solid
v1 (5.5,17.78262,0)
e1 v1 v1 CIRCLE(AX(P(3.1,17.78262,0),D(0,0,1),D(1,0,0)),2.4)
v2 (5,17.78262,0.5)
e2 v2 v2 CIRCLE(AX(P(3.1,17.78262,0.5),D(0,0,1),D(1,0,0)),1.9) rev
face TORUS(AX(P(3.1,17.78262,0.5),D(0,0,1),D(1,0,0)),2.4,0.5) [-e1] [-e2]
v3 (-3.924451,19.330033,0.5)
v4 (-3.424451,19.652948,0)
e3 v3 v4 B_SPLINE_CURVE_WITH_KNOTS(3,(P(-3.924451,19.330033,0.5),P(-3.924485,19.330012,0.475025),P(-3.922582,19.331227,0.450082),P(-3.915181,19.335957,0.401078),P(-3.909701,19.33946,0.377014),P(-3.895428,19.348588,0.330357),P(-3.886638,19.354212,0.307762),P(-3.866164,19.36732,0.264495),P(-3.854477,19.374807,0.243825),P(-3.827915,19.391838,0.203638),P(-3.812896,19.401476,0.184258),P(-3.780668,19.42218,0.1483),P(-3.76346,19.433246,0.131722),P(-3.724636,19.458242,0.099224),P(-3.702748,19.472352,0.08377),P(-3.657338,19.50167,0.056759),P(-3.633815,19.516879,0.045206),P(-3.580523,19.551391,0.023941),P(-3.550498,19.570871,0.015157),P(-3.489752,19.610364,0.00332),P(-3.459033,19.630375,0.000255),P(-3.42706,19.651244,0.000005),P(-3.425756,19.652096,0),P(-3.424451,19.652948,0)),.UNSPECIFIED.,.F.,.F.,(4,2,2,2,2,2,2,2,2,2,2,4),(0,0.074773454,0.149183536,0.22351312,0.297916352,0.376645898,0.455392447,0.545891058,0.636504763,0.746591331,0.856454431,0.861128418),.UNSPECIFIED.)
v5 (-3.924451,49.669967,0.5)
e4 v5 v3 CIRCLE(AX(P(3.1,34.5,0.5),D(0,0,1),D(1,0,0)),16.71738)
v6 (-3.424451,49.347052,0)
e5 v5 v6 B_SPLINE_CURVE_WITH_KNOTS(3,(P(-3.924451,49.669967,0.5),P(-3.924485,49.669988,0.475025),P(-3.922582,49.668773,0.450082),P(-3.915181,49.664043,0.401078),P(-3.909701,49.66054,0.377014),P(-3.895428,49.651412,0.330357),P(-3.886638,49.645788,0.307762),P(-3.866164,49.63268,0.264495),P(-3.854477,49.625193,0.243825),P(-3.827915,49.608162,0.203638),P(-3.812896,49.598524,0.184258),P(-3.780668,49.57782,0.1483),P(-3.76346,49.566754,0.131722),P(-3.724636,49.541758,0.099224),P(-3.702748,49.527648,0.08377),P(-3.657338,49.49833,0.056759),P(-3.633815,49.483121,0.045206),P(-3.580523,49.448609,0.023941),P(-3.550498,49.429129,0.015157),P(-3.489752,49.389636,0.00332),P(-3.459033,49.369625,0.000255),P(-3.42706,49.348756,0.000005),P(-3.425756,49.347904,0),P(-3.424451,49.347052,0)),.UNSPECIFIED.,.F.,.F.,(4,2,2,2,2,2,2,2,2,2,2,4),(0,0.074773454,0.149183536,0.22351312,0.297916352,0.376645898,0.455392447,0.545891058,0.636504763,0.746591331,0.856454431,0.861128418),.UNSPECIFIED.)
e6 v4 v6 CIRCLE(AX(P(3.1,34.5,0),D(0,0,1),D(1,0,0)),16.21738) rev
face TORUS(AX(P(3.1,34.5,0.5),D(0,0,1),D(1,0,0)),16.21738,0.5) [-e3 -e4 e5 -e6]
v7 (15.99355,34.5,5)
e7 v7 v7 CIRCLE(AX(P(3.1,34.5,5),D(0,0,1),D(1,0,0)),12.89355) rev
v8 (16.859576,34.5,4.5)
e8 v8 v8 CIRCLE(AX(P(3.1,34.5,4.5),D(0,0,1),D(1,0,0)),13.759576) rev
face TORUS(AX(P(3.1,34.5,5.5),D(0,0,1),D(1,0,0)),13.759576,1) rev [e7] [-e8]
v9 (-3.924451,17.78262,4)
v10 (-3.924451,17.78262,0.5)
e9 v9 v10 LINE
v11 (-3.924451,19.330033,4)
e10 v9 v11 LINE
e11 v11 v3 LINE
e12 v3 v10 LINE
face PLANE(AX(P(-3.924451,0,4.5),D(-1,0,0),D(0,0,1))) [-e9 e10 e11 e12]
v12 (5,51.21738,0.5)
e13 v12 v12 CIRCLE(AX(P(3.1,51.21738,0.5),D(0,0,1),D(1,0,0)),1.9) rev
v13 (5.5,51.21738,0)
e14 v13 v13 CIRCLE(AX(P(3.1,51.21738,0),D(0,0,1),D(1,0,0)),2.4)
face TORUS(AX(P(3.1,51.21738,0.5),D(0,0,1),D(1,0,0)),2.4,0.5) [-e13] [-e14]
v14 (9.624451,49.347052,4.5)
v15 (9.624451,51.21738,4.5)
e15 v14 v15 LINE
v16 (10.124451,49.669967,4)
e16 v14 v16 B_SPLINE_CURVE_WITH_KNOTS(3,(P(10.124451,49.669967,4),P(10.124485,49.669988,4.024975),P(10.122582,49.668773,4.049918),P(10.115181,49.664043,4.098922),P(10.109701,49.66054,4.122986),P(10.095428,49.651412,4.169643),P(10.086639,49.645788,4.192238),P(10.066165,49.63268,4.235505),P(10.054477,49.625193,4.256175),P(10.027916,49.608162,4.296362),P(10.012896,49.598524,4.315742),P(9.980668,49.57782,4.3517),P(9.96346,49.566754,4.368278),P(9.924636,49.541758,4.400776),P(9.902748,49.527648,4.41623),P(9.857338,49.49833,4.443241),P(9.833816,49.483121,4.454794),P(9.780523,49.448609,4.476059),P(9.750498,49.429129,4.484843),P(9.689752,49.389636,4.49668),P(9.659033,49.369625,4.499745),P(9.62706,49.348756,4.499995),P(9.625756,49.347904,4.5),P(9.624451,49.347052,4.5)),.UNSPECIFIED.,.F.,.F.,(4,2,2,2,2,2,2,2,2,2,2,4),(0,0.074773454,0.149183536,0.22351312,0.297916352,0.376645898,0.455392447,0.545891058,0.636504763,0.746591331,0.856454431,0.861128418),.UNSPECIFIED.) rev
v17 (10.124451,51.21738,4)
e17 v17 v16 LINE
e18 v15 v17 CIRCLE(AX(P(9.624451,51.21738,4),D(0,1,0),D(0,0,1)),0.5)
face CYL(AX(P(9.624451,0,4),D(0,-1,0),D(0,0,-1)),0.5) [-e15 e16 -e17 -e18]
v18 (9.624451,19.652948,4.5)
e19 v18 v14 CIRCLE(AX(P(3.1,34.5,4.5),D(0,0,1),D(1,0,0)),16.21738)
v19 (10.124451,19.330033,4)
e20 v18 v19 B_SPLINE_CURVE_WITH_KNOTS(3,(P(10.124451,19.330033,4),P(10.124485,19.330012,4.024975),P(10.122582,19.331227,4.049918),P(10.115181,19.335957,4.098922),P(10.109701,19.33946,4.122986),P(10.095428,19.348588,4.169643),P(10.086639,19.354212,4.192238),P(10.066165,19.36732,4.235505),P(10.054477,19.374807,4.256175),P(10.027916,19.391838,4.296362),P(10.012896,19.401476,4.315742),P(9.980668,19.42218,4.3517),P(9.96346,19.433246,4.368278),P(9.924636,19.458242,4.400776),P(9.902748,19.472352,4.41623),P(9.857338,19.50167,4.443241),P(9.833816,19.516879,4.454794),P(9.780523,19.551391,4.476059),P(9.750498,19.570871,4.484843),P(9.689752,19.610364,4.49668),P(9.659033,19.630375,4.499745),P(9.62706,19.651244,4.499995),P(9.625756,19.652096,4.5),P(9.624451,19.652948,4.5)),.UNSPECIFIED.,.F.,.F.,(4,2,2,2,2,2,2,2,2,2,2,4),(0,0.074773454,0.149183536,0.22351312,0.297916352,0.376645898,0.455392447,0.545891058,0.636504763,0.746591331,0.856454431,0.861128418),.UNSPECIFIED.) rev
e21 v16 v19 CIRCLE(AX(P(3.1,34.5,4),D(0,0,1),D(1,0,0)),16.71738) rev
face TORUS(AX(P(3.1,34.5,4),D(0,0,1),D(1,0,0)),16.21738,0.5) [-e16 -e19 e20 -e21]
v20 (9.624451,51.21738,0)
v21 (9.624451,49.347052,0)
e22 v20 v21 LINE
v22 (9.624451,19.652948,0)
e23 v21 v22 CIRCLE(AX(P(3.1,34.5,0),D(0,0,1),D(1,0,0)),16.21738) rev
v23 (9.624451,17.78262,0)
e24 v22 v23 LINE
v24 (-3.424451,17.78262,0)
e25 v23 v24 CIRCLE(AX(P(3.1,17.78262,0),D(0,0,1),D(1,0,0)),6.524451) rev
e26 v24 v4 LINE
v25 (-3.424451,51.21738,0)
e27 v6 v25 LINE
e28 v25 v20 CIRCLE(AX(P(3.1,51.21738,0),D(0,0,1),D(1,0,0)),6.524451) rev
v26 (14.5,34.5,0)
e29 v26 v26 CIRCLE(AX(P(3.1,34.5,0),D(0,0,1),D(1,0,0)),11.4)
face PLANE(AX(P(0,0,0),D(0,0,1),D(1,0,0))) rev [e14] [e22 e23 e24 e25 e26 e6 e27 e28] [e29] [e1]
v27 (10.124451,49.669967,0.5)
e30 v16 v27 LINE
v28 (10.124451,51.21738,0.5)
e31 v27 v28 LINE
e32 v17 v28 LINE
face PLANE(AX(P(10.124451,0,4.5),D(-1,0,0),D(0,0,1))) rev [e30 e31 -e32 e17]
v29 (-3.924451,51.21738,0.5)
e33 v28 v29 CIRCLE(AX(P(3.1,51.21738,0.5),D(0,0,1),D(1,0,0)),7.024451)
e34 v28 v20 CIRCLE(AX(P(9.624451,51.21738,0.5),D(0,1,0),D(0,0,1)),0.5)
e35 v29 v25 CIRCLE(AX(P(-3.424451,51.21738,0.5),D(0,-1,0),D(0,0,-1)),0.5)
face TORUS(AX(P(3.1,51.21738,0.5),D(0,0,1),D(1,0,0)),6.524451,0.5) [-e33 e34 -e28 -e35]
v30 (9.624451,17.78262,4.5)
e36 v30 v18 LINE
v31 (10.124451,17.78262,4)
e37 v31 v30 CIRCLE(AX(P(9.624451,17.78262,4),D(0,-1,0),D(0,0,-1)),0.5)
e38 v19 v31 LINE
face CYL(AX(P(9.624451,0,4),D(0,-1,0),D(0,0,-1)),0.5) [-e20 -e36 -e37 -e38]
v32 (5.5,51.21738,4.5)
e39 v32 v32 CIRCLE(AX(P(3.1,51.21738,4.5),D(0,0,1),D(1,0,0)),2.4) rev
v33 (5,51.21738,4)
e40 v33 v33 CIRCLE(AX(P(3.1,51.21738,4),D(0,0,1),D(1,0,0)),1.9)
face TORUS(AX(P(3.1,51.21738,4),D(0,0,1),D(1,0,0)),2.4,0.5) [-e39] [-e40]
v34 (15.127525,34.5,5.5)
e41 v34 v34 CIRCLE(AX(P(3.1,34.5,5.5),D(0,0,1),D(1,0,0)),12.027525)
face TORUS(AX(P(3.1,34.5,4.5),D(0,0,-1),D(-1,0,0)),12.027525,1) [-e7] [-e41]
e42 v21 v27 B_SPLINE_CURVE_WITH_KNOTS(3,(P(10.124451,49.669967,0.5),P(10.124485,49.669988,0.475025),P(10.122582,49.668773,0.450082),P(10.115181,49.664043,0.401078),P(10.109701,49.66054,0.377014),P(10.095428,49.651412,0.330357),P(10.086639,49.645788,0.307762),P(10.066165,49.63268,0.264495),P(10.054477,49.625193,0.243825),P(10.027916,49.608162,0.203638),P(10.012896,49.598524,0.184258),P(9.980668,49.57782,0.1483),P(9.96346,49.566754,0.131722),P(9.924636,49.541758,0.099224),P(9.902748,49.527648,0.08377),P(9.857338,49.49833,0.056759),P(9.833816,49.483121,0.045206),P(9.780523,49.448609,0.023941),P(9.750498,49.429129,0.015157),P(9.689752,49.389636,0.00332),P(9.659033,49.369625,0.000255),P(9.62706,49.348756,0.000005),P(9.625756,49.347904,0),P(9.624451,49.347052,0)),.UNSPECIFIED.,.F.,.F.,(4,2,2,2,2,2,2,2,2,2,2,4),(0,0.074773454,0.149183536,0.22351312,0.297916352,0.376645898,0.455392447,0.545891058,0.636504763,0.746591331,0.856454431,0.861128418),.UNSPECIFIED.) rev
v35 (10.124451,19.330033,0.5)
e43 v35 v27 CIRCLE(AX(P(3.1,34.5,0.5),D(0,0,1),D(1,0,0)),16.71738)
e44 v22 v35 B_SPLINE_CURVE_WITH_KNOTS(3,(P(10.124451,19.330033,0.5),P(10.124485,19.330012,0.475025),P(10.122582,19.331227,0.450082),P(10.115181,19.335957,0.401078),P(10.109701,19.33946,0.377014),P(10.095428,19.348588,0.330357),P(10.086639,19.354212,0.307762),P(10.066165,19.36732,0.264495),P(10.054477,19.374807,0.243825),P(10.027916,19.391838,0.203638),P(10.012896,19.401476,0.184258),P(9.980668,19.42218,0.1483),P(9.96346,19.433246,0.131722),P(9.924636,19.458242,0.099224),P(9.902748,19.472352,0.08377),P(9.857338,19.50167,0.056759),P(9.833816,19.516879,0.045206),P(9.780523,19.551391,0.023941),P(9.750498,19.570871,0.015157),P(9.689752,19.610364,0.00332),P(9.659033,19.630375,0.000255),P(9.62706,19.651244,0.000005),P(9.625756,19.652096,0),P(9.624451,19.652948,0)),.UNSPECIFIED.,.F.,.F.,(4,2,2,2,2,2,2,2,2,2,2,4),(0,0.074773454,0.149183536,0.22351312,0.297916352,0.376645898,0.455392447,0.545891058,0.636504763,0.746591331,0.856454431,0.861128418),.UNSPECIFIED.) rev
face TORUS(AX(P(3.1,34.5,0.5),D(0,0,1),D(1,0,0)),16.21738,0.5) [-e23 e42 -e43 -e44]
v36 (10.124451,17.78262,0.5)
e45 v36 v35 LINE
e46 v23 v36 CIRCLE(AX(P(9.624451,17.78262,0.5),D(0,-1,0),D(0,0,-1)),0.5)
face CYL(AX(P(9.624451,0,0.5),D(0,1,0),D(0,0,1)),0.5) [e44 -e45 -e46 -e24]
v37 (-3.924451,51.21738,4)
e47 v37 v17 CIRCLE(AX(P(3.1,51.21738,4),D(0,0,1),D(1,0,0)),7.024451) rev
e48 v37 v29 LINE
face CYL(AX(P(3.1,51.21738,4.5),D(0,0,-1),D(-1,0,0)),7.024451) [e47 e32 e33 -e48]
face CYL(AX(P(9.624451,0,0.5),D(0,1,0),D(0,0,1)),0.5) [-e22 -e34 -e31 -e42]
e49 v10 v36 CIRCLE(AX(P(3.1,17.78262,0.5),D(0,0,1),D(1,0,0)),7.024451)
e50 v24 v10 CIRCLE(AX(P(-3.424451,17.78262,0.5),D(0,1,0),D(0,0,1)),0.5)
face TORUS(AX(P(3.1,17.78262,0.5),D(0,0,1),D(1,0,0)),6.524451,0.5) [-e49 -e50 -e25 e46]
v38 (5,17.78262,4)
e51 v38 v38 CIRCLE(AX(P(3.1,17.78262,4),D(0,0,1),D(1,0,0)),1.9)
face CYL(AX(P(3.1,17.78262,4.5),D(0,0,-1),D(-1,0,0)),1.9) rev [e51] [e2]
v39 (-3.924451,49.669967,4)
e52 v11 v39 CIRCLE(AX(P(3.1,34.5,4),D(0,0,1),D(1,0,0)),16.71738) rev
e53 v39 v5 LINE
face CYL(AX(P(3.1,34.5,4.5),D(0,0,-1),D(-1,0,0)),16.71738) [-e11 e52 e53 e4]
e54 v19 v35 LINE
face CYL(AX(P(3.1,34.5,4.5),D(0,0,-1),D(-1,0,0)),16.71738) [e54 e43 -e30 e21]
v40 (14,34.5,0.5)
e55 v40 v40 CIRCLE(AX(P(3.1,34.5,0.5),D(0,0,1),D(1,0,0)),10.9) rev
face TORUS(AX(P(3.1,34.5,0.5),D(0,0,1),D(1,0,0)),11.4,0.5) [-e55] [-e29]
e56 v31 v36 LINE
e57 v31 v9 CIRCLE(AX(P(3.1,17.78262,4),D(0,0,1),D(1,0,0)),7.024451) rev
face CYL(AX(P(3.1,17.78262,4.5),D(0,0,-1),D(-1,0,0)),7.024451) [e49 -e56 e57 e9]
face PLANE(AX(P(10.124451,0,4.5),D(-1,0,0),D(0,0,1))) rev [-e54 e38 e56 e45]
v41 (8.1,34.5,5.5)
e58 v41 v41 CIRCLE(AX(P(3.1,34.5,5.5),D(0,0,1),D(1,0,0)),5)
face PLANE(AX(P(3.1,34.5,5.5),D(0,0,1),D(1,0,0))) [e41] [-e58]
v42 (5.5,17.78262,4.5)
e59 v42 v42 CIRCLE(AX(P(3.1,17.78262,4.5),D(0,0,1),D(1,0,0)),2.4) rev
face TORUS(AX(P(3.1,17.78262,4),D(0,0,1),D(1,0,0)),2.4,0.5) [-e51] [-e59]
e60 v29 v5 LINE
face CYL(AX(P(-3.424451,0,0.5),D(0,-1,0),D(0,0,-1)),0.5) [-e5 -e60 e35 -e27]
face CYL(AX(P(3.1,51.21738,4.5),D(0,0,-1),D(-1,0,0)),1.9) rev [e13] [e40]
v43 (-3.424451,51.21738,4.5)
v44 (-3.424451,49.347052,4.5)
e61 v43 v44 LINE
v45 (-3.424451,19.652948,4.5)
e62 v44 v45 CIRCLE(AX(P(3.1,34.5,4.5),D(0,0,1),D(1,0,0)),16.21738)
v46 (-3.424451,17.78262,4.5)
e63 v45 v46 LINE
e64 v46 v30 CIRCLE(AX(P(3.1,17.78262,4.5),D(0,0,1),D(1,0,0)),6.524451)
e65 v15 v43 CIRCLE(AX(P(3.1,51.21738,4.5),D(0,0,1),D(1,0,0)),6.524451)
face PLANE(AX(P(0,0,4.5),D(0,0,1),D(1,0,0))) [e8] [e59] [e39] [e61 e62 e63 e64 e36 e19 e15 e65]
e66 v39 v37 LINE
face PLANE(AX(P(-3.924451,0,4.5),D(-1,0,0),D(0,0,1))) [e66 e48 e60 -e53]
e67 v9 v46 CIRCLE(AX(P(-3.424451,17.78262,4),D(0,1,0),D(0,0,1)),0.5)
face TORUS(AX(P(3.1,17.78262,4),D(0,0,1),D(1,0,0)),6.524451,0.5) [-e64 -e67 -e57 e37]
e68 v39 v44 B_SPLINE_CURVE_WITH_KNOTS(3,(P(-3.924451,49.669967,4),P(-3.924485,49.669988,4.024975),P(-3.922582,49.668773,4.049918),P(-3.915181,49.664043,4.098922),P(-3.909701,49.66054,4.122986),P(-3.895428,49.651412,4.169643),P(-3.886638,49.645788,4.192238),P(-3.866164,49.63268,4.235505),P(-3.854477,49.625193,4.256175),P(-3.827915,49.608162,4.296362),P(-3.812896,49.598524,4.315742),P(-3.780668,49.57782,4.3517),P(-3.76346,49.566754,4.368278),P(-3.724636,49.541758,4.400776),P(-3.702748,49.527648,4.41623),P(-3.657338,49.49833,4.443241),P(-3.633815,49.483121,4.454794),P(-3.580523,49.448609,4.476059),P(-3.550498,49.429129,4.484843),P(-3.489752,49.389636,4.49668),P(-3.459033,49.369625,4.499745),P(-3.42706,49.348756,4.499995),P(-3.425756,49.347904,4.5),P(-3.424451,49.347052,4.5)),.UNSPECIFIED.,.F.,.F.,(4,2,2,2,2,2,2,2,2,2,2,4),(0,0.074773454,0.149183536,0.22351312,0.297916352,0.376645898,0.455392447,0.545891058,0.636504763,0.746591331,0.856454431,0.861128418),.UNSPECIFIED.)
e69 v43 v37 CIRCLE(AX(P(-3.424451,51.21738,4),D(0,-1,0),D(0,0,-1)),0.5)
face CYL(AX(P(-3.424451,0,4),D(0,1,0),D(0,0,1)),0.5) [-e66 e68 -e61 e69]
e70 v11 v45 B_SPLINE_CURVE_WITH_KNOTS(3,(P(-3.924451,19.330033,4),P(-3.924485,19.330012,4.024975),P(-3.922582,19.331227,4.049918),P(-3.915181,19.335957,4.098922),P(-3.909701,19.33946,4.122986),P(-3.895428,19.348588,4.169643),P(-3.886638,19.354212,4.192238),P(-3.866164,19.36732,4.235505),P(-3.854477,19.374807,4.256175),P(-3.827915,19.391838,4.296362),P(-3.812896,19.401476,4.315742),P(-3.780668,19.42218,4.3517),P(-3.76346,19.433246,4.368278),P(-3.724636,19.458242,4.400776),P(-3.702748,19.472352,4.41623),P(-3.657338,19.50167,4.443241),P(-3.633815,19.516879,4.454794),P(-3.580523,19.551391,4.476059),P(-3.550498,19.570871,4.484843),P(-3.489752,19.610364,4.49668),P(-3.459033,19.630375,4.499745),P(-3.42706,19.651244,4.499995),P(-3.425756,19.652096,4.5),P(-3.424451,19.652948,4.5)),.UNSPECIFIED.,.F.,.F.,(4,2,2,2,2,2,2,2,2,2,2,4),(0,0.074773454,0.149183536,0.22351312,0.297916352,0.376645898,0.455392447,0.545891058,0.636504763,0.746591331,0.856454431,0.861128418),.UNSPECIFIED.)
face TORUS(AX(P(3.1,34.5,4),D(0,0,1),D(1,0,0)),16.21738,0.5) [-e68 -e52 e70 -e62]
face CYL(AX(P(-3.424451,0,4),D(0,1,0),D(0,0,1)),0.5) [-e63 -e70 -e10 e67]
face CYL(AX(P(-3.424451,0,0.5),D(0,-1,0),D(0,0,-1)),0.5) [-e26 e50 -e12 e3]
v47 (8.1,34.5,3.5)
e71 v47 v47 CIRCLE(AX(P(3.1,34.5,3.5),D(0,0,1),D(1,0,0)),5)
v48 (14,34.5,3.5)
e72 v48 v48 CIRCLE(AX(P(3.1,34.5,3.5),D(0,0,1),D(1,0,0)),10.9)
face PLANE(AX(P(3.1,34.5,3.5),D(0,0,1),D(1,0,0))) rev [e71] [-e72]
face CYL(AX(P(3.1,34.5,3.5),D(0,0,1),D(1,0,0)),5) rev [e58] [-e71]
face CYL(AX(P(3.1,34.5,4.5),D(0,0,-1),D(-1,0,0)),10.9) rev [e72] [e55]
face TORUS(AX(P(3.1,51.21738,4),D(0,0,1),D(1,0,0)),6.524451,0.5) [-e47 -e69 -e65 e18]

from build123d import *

# Parameters (mm, degrees)
SKETCH1_R                = 10.9
SKETCH1_R_2              = 1.9
BOSS_EXTRUDE1_DEPTH      = 4.5
BOSS_EXTRUDE2_DEPTH      = 1
BOSS_EXTRUDE2_DEPTH_BACK = 1
SKETCH2_R                = 12.759575688
SKETCH2_R_2              = 5
FILLET1_R                = 1
FILLET3_R                = 0.5


with BuildPart() as part:
    # Sketch1 → Boss-Extrude1 (new body)
    with BuildSketch(Plane.XY):
        with BuildLine():
            Line((-3.924451112, 17.782619509), (-3.924451112, 19.330033071))
            ThreePointArc((-3.924451112, 19.330033071), (-13.617380462, 34.5), (-3.924451112, 49.669966929))
            Line((-3.924451112, 49.669966929), (-3.924451112, 51.217380491))
            ThreePointArc((-3.924451112, 51.217380491), (3.100000029, 58.241831631), (10.124451169, 51.217380491))
            Line((10.124451169, 51.217380491), (10.124451169, 49.669966929))
            ThreePointArc((10.124451169, 49.669966929), (19.817380519, 34.5), (10.124451169, 19.330033071))
            Line((10.124451169, 19.330033071), (10.124451169, 17.782619509))
            ThreePointArc((10.124451169, 17.782619509), (3.100000029, 10.758168369), (-3.924451112, 17.782619509))
        make_face()
        with Locations((3.100000029, 34.5)):
            Circle(SKETCH1_R, mode=Mode.SUBTRACT)
        with Locations((3.100000029, 51.217380491)):
            Circle(SKETCH1_R_2, mode=Mode.SUBTRACT)
        with Locations((3.100000029, 17.782619509)):
            Circle(SKETCH1_R_2, mode=Mode.SUBTRACT)
    extrude(amount=BOSS_EXTRUDE1_DEPTH)

    # Sketch2 → Boss-Extrude2 (add, two sides: drawn at the far end of the back side and taken through both)
    with BuildSketch(Plane.XY.offset(4.5).offset(-BOSS_EXTRUDE2_DEPTH_BACK)):
        with Locations((3.100000029, 34.5)):
            Circle(SKETCH2_R)
        with Locations((3.100000029, 34.5)):
            Circle(SKETCH2_R_2, mode=Mode.SUBTRACT)
    extrude(amount=BOSS_EXTRUDE2_DEPTH + BOSS_EXTRUDE2_DEPTH_BACK)

    # Fillet1
    fillet1_edges = [part.edges().sort_by_distance(p)[0] for p in [
        (-9.659575659, 34.5, 4.5),
    ]]
    fillet(fillet1_edges, radius=FILLET1_R - 0.0001)  # a hair under: the kernel refuses the full size

    # Fillet2: read off the stored shape, not the designer's step
    # Fillet2 outline → Fillet2 (revolve, cut)
    with BuildSketch(Plane(origin=(3.100000029, 34.5, 0), x_dir=(1, 0, 0), z_dir=(0, -1, 0))):
        with BuildLine():
            Line((12.893550284, 5.5), (12.02752488, 5.5))
            ThreePointArc((12.02752488, 5.5), (12.52752488, 5.366025404), (12.893550284, 5))
            Line((12.893550284, 5), (12.893550284, 5.5))
        make_face()
    revolve(axis=Axis((3.100000029, 34.5, 0), (0, 0, 1)), mode=Mode.SUBTRACT)

    # Fillet3
    fillet3_edges = [part.edges().sort_by_distance(p)[0] for p in [
        (-3.924451112, 50.44367371, 0),
        (1.200000029, 51.217380491, 4.5),
        (3.100000029, 58.241831631, 0),
        (10.124451169, 50.44367371, 0),
        (19.817380519, 34.5, 0),
        (10.124451169, 18.55632629, 0),
        (3.100000029, 10.758168369, 0),
        (-3.924451112, 18.55632629, 0),
        (-13.617380462, 34.5, 0),
        (1.200000029, 17.782619509, 0),
        (1.200000029, 51.217380491, 0),
        (-7.799999971, 34.5, 0),
        (1.200000029, 17.782619509, 4.5),
        (-13.617380462, 34.5, 4.5),
        (-3.924451112, 18.55632629, 4.5),
        (3.100000029, 10.758168369, 4.5),
        (10.124451169, 18.55632629, 4.5),
        (19.817380519, 34.5, 4.5),
        (10.124451169, 50.44367371, 4.5),
        (3.100000029, 58.241831631, 4.5),
        (-3.924451112, 50.44367371, 4.5),
    ]]
    fillet(fillet3_edges, radius=FILLET3_R)


solid = part.part
